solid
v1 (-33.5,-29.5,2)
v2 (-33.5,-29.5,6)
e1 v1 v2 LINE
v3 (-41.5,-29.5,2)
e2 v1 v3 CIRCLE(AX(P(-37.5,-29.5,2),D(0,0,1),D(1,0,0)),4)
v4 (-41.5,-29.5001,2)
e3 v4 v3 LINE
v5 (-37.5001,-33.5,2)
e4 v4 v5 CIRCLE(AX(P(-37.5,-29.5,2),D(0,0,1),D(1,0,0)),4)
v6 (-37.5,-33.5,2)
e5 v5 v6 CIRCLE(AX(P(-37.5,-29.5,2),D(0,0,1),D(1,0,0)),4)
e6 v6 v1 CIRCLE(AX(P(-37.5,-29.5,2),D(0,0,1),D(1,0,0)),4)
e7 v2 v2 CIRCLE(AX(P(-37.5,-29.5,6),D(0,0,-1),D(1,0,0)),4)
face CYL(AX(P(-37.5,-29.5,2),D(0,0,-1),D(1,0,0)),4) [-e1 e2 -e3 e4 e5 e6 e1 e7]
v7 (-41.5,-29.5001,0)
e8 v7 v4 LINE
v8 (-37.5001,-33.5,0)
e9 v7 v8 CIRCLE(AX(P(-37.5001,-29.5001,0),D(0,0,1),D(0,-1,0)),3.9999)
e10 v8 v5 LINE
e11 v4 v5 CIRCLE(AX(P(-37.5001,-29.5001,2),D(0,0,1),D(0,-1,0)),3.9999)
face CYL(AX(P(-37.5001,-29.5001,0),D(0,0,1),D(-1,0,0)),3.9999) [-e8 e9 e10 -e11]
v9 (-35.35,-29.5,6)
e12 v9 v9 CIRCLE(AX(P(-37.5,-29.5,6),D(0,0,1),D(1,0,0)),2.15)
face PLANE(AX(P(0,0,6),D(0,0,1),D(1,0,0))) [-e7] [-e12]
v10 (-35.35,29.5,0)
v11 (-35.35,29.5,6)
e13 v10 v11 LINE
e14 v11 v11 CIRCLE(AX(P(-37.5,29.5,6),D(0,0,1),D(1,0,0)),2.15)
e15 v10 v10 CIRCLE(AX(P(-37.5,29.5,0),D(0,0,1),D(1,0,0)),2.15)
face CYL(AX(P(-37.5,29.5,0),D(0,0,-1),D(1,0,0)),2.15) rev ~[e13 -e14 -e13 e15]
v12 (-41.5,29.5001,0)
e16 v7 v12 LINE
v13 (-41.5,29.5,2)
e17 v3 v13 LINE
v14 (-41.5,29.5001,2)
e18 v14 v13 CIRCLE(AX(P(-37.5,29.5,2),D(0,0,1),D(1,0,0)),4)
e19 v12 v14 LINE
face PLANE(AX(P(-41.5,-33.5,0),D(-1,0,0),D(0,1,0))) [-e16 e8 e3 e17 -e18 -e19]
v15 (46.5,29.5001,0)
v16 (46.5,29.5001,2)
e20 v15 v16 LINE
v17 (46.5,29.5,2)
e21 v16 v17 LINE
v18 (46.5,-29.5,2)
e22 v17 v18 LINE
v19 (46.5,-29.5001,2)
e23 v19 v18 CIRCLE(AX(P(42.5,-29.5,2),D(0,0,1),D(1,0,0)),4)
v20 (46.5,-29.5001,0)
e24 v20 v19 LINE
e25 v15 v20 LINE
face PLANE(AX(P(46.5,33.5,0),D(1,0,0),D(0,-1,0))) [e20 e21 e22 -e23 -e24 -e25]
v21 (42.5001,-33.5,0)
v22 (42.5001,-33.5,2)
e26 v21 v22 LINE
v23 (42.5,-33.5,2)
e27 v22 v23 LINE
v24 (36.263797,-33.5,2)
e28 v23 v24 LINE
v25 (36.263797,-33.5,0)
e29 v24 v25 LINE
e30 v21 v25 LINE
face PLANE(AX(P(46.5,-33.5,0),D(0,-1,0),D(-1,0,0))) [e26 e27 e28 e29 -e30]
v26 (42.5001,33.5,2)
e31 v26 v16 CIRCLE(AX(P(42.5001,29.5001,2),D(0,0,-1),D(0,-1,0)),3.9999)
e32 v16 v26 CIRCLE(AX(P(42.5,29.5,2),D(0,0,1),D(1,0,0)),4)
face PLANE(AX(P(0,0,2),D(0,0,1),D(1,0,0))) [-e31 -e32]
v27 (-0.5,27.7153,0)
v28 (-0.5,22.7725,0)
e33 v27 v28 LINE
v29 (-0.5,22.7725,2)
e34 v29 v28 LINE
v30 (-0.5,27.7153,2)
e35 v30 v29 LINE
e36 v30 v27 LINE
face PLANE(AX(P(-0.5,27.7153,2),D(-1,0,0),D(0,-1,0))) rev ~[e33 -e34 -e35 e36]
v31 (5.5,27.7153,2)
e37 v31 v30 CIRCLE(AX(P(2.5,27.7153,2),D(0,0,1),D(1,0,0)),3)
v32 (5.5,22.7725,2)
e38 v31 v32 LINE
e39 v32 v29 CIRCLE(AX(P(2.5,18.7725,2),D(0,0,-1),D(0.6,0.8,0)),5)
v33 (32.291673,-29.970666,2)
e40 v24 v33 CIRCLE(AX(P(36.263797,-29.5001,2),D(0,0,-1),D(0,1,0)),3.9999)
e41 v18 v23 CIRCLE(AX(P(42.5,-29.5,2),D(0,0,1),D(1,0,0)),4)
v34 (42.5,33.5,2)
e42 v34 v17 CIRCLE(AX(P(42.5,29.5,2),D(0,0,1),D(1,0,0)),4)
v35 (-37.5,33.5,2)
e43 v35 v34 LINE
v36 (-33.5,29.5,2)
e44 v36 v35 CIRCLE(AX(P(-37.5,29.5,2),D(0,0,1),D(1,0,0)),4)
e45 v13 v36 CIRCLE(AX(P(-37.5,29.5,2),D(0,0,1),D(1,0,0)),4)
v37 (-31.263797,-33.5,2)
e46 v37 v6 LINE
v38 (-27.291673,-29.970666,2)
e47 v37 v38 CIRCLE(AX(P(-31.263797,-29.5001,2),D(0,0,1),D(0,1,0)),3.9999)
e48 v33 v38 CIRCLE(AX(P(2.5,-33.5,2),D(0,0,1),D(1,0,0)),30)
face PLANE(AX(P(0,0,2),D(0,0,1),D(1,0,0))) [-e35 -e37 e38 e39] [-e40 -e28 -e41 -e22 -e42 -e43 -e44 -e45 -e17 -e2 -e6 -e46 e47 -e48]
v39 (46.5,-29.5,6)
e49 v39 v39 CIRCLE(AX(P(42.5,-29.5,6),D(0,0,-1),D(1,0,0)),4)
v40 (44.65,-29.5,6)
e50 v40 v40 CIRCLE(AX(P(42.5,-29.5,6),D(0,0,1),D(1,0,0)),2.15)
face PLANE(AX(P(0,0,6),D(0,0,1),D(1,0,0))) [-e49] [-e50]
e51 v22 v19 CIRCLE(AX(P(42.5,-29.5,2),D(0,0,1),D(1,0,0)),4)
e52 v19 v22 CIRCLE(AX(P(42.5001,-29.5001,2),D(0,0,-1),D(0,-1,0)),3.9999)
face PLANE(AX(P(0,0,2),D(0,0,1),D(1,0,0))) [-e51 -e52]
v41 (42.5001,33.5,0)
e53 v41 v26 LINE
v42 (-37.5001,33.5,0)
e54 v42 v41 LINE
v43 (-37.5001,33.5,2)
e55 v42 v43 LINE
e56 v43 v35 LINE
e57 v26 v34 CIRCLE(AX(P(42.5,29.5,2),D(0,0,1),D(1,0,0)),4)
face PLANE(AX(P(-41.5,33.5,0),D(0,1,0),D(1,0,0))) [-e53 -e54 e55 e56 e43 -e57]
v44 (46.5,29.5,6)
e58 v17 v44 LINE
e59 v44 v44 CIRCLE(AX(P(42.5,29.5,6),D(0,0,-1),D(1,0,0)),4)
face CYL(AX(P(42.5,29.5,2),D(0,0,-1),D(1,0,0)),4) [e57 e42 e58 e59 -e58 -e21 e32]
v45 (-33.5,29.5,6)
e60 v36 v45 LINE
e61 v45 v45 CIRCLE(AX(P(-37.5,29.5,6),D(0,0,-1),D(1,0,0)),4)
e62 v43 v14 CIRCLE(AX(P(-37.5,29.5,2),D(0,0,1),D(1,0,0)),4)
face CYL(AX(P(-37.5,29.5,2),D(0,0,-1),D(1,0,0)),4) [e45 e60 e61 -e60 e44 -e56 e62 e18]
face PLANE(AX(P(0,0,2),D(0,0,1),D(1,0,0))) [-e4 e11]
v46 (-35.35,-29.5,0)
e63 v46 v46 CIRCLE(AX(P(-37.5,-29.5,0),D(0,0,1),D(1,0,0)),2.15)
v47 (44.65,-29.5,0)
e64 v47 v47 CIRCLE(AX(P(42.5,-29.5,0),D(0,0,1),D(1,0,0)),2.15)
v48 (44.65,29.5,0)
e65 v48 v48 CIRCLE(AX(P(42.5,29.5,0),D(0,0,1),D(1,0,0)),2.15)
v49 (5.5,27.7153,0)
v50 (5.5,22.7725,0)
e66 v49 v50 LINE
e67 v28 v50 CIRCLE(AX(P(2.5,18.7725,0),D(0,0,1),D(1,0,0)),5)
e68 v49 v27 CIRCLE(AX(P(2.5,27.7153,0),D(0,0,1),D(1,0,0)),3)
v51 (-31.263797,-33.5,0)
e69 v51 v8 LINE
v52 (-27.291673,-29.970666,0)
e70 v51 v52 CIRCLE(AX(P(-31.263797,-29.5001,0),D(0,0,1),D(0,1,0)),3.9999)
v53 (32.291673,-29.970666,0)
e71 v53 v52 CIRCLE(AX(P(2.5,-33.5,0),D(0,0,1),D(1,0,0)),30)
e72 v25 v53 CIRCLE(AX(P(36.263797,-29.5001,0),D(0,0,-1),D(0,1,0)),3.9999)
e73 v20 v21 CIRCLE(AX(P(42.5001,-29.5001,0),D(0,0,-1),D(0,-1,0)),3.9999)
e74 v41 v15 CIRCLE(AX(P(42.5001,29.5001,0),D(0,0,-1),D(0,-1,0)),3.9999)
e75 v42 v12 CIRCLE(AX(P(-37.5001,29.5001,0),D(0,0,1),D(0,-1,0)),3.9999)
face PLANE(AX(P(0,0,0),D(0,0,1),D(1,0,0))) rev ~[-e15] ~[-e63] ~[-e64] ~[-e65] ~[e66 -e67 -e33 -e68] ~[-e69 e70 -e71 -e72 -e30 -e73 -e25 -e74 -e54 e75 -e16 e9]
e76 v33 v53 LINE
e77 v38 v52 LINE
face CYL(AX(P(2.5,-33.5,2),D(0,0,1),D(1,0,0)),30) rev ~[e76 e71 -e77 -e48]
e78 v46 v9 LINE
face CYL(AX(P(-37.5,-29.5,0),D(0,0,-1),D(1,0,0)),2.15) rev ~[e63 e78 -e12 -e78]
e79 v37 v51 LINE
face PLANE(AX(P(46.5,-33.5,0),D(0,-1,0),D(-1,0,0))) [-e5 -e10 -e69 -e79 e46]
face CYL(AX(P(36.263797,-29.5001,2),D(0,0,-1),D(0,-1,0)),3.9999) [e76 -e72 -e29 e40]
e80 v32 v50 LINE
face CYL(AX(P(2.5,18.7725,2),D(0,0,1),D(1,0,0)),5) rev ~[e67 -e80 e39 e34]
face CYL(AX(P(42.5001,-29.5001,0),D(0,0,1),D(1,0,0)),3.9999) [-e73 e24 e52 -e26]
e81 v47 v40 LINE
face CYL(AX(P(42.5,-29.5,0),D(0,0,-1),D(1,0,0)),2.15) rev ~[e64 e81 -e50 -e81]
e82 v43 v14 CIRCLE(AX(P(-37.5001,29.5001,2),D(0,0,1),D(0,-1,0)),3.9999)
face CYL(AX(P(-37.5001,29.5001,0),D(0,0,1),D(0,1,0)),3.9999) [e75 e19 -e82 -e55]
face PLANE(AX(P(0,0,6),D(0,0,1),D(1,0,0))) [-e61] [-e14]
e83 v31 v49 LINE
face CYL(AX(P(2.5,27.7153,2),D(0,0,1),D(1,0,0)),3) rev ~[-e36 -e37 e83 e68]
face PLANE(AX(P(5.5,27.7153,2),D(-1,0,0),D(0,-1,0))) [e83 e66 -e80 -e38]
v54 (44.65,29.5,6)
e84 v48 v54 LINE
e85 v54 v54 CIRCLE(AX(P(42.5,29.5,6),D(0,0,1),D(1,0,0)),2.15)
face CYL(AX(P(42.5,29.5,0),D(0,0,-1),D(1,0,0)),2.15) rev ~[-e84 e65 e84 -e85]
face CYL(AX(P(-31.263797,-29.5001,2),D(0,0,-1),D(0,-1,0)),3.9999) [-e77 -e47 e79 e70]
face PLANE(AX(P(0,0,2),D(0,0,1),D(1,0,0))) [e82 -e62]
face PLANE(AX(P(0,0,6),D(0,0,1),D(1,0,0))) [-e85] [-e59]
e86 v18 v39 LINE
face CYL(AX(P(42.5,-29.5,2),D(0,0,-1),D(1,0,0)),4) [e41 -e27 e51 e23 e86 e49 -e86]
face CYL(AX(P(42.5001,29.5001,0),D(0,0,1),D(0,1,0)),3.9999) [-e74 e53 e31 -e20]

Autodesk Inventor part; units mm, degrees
ref_plane "YZ Plane" through (0, 0, 0) normal (1, 0, 0) x (0, 1, 0)
ref_plane "XZ Plane" through (0, 0, 0) normal (0, 1, 0) x (-1, 0, 0)
ref_plane "XY Plane" through (0, 0, 0) normal (0, 0, 1) x (1, 0, 0)
ref_plane "Work Plane1" through (0, 0, 0) normal (0, 0, 1) x (1, 0, 0)
ref_plane "Work Plane2" through (0, 0, 0) normal (0, 0, 1) x (1, 0, 0)
sketch "Sketch2" plane through (0, 0, 0) normal (0, 0, 1) x (1, 0, 0)
  circle A0 centre (42.5, -29.5) radius 2.15 projected
  circle A1 centre (-37.5, -29.5) radius 2.15 projected
  circle A2 centre (-37.5, 29.5) radius 2.15 projected
  circle A3 centre (42.5, 29.5) radius 2.15 projected
  line L0 (-41.5, 33.5) -> (46.5, 33.5)
  line L1 (46.5, 33.5) -> (46.5, -33.5)
  line L2 (46.5, -33.5) -> (-41.5, -33.5)
  line L3 (-41.5, -33.5) -> (-41.5, 33.5)
  line L4 (-37.5, 29.5) -> (42.5, 29.5)
  point P0 (0, 0)
  point P1 (-41.5, 0)
  point P2 (2.5, 29.5)
  point P3 (2.5, 33.5)
  dimension "d0" = 67
  dimension "d1" = 88
extrude "Extrusion1" add sketch "Sketch2" along normal blind 2
sketch "Sketch3" plane through (0, 0, 2) normal (0, 0, 1) x (1, 0, 0)
  circle A0 centre (2.5, 18.7725) radius 5
  line L0 (46.5, 33.5) -> (-41.5, 33.5) projected
  circle A1 centre (2.5, 27.7153) radius 3
  line L1 (-0.5, 27.7153) -> (-0.5, 22.7725)
  line L2 (5.5, 27.7153) -> (5.5, 22.7725)
  point P0 (0, 0)
  point P1 (2.5, 33.5)
  dimension "d4" = 10
  dimension "d5" = 6
extrude "Extrusion2" cut sketch "Sketch3" against normal through all
sketch "Sketch4" plane through (0, 0, 2) normal (0, 0, 1) x (1, 0, 0)
  circle A0 centre (-37.5, 29.5) radius 2.15 projected
  circle A1 centre (-37.5, 29.5) radius 4
  line L0 (46.5, 33.5) -> (-41.5, 33.5) projected
  circle A2 centre (-37.5, -29.5) radius 2.15 projected
  circle A3 centre (-37.5, -29.5) radius 4
  line L1 (-41.5, -33.5) -> (46.5, -33.5) projected
  circle A4 centre (42.5, -29.5) radius 2.15 projected
  circle A5 centre (42.5, -29.5) radius 4
  circle A6 centre (42.5, 29.5) radius 2.15 projected
  circle A7 centre (42.5, 29.5) radius 4
  point P0 (0, 0)
extrude "Extrusion3" add sketch "Sketch4" along normal blind 4
sketch "Sketch5" plane through (0, 0, 2) normal (0, 0, 1) x (1, 0, 0)
  line L0 (-41.5, -33.5) -> (46.5, -33.5) projected
  circle A0 centre (2.5, -33.5) radius 30
  point P0 (0, 0)
  point P1 (32.5, -33.5)
  point P2 (-27.5, -33.5)
  dimension "d10" = 60
extrude "Extrusion4" cut sketch "Sketch5" against normal through all contours A0 L0 picked at (9.9851, -22.0825)
fillet "Fillet1" radius 4 6 edges at (-41.5, 33.5, 1) (46.5, 33.5, 1) (-41.5, -33.5, 1) (46.5, -33.5, 1) (-27.5, -33.5, 1) (32.5, -33.5, 1)
properties part number "led 7 seg with sec v3 wall holder"
